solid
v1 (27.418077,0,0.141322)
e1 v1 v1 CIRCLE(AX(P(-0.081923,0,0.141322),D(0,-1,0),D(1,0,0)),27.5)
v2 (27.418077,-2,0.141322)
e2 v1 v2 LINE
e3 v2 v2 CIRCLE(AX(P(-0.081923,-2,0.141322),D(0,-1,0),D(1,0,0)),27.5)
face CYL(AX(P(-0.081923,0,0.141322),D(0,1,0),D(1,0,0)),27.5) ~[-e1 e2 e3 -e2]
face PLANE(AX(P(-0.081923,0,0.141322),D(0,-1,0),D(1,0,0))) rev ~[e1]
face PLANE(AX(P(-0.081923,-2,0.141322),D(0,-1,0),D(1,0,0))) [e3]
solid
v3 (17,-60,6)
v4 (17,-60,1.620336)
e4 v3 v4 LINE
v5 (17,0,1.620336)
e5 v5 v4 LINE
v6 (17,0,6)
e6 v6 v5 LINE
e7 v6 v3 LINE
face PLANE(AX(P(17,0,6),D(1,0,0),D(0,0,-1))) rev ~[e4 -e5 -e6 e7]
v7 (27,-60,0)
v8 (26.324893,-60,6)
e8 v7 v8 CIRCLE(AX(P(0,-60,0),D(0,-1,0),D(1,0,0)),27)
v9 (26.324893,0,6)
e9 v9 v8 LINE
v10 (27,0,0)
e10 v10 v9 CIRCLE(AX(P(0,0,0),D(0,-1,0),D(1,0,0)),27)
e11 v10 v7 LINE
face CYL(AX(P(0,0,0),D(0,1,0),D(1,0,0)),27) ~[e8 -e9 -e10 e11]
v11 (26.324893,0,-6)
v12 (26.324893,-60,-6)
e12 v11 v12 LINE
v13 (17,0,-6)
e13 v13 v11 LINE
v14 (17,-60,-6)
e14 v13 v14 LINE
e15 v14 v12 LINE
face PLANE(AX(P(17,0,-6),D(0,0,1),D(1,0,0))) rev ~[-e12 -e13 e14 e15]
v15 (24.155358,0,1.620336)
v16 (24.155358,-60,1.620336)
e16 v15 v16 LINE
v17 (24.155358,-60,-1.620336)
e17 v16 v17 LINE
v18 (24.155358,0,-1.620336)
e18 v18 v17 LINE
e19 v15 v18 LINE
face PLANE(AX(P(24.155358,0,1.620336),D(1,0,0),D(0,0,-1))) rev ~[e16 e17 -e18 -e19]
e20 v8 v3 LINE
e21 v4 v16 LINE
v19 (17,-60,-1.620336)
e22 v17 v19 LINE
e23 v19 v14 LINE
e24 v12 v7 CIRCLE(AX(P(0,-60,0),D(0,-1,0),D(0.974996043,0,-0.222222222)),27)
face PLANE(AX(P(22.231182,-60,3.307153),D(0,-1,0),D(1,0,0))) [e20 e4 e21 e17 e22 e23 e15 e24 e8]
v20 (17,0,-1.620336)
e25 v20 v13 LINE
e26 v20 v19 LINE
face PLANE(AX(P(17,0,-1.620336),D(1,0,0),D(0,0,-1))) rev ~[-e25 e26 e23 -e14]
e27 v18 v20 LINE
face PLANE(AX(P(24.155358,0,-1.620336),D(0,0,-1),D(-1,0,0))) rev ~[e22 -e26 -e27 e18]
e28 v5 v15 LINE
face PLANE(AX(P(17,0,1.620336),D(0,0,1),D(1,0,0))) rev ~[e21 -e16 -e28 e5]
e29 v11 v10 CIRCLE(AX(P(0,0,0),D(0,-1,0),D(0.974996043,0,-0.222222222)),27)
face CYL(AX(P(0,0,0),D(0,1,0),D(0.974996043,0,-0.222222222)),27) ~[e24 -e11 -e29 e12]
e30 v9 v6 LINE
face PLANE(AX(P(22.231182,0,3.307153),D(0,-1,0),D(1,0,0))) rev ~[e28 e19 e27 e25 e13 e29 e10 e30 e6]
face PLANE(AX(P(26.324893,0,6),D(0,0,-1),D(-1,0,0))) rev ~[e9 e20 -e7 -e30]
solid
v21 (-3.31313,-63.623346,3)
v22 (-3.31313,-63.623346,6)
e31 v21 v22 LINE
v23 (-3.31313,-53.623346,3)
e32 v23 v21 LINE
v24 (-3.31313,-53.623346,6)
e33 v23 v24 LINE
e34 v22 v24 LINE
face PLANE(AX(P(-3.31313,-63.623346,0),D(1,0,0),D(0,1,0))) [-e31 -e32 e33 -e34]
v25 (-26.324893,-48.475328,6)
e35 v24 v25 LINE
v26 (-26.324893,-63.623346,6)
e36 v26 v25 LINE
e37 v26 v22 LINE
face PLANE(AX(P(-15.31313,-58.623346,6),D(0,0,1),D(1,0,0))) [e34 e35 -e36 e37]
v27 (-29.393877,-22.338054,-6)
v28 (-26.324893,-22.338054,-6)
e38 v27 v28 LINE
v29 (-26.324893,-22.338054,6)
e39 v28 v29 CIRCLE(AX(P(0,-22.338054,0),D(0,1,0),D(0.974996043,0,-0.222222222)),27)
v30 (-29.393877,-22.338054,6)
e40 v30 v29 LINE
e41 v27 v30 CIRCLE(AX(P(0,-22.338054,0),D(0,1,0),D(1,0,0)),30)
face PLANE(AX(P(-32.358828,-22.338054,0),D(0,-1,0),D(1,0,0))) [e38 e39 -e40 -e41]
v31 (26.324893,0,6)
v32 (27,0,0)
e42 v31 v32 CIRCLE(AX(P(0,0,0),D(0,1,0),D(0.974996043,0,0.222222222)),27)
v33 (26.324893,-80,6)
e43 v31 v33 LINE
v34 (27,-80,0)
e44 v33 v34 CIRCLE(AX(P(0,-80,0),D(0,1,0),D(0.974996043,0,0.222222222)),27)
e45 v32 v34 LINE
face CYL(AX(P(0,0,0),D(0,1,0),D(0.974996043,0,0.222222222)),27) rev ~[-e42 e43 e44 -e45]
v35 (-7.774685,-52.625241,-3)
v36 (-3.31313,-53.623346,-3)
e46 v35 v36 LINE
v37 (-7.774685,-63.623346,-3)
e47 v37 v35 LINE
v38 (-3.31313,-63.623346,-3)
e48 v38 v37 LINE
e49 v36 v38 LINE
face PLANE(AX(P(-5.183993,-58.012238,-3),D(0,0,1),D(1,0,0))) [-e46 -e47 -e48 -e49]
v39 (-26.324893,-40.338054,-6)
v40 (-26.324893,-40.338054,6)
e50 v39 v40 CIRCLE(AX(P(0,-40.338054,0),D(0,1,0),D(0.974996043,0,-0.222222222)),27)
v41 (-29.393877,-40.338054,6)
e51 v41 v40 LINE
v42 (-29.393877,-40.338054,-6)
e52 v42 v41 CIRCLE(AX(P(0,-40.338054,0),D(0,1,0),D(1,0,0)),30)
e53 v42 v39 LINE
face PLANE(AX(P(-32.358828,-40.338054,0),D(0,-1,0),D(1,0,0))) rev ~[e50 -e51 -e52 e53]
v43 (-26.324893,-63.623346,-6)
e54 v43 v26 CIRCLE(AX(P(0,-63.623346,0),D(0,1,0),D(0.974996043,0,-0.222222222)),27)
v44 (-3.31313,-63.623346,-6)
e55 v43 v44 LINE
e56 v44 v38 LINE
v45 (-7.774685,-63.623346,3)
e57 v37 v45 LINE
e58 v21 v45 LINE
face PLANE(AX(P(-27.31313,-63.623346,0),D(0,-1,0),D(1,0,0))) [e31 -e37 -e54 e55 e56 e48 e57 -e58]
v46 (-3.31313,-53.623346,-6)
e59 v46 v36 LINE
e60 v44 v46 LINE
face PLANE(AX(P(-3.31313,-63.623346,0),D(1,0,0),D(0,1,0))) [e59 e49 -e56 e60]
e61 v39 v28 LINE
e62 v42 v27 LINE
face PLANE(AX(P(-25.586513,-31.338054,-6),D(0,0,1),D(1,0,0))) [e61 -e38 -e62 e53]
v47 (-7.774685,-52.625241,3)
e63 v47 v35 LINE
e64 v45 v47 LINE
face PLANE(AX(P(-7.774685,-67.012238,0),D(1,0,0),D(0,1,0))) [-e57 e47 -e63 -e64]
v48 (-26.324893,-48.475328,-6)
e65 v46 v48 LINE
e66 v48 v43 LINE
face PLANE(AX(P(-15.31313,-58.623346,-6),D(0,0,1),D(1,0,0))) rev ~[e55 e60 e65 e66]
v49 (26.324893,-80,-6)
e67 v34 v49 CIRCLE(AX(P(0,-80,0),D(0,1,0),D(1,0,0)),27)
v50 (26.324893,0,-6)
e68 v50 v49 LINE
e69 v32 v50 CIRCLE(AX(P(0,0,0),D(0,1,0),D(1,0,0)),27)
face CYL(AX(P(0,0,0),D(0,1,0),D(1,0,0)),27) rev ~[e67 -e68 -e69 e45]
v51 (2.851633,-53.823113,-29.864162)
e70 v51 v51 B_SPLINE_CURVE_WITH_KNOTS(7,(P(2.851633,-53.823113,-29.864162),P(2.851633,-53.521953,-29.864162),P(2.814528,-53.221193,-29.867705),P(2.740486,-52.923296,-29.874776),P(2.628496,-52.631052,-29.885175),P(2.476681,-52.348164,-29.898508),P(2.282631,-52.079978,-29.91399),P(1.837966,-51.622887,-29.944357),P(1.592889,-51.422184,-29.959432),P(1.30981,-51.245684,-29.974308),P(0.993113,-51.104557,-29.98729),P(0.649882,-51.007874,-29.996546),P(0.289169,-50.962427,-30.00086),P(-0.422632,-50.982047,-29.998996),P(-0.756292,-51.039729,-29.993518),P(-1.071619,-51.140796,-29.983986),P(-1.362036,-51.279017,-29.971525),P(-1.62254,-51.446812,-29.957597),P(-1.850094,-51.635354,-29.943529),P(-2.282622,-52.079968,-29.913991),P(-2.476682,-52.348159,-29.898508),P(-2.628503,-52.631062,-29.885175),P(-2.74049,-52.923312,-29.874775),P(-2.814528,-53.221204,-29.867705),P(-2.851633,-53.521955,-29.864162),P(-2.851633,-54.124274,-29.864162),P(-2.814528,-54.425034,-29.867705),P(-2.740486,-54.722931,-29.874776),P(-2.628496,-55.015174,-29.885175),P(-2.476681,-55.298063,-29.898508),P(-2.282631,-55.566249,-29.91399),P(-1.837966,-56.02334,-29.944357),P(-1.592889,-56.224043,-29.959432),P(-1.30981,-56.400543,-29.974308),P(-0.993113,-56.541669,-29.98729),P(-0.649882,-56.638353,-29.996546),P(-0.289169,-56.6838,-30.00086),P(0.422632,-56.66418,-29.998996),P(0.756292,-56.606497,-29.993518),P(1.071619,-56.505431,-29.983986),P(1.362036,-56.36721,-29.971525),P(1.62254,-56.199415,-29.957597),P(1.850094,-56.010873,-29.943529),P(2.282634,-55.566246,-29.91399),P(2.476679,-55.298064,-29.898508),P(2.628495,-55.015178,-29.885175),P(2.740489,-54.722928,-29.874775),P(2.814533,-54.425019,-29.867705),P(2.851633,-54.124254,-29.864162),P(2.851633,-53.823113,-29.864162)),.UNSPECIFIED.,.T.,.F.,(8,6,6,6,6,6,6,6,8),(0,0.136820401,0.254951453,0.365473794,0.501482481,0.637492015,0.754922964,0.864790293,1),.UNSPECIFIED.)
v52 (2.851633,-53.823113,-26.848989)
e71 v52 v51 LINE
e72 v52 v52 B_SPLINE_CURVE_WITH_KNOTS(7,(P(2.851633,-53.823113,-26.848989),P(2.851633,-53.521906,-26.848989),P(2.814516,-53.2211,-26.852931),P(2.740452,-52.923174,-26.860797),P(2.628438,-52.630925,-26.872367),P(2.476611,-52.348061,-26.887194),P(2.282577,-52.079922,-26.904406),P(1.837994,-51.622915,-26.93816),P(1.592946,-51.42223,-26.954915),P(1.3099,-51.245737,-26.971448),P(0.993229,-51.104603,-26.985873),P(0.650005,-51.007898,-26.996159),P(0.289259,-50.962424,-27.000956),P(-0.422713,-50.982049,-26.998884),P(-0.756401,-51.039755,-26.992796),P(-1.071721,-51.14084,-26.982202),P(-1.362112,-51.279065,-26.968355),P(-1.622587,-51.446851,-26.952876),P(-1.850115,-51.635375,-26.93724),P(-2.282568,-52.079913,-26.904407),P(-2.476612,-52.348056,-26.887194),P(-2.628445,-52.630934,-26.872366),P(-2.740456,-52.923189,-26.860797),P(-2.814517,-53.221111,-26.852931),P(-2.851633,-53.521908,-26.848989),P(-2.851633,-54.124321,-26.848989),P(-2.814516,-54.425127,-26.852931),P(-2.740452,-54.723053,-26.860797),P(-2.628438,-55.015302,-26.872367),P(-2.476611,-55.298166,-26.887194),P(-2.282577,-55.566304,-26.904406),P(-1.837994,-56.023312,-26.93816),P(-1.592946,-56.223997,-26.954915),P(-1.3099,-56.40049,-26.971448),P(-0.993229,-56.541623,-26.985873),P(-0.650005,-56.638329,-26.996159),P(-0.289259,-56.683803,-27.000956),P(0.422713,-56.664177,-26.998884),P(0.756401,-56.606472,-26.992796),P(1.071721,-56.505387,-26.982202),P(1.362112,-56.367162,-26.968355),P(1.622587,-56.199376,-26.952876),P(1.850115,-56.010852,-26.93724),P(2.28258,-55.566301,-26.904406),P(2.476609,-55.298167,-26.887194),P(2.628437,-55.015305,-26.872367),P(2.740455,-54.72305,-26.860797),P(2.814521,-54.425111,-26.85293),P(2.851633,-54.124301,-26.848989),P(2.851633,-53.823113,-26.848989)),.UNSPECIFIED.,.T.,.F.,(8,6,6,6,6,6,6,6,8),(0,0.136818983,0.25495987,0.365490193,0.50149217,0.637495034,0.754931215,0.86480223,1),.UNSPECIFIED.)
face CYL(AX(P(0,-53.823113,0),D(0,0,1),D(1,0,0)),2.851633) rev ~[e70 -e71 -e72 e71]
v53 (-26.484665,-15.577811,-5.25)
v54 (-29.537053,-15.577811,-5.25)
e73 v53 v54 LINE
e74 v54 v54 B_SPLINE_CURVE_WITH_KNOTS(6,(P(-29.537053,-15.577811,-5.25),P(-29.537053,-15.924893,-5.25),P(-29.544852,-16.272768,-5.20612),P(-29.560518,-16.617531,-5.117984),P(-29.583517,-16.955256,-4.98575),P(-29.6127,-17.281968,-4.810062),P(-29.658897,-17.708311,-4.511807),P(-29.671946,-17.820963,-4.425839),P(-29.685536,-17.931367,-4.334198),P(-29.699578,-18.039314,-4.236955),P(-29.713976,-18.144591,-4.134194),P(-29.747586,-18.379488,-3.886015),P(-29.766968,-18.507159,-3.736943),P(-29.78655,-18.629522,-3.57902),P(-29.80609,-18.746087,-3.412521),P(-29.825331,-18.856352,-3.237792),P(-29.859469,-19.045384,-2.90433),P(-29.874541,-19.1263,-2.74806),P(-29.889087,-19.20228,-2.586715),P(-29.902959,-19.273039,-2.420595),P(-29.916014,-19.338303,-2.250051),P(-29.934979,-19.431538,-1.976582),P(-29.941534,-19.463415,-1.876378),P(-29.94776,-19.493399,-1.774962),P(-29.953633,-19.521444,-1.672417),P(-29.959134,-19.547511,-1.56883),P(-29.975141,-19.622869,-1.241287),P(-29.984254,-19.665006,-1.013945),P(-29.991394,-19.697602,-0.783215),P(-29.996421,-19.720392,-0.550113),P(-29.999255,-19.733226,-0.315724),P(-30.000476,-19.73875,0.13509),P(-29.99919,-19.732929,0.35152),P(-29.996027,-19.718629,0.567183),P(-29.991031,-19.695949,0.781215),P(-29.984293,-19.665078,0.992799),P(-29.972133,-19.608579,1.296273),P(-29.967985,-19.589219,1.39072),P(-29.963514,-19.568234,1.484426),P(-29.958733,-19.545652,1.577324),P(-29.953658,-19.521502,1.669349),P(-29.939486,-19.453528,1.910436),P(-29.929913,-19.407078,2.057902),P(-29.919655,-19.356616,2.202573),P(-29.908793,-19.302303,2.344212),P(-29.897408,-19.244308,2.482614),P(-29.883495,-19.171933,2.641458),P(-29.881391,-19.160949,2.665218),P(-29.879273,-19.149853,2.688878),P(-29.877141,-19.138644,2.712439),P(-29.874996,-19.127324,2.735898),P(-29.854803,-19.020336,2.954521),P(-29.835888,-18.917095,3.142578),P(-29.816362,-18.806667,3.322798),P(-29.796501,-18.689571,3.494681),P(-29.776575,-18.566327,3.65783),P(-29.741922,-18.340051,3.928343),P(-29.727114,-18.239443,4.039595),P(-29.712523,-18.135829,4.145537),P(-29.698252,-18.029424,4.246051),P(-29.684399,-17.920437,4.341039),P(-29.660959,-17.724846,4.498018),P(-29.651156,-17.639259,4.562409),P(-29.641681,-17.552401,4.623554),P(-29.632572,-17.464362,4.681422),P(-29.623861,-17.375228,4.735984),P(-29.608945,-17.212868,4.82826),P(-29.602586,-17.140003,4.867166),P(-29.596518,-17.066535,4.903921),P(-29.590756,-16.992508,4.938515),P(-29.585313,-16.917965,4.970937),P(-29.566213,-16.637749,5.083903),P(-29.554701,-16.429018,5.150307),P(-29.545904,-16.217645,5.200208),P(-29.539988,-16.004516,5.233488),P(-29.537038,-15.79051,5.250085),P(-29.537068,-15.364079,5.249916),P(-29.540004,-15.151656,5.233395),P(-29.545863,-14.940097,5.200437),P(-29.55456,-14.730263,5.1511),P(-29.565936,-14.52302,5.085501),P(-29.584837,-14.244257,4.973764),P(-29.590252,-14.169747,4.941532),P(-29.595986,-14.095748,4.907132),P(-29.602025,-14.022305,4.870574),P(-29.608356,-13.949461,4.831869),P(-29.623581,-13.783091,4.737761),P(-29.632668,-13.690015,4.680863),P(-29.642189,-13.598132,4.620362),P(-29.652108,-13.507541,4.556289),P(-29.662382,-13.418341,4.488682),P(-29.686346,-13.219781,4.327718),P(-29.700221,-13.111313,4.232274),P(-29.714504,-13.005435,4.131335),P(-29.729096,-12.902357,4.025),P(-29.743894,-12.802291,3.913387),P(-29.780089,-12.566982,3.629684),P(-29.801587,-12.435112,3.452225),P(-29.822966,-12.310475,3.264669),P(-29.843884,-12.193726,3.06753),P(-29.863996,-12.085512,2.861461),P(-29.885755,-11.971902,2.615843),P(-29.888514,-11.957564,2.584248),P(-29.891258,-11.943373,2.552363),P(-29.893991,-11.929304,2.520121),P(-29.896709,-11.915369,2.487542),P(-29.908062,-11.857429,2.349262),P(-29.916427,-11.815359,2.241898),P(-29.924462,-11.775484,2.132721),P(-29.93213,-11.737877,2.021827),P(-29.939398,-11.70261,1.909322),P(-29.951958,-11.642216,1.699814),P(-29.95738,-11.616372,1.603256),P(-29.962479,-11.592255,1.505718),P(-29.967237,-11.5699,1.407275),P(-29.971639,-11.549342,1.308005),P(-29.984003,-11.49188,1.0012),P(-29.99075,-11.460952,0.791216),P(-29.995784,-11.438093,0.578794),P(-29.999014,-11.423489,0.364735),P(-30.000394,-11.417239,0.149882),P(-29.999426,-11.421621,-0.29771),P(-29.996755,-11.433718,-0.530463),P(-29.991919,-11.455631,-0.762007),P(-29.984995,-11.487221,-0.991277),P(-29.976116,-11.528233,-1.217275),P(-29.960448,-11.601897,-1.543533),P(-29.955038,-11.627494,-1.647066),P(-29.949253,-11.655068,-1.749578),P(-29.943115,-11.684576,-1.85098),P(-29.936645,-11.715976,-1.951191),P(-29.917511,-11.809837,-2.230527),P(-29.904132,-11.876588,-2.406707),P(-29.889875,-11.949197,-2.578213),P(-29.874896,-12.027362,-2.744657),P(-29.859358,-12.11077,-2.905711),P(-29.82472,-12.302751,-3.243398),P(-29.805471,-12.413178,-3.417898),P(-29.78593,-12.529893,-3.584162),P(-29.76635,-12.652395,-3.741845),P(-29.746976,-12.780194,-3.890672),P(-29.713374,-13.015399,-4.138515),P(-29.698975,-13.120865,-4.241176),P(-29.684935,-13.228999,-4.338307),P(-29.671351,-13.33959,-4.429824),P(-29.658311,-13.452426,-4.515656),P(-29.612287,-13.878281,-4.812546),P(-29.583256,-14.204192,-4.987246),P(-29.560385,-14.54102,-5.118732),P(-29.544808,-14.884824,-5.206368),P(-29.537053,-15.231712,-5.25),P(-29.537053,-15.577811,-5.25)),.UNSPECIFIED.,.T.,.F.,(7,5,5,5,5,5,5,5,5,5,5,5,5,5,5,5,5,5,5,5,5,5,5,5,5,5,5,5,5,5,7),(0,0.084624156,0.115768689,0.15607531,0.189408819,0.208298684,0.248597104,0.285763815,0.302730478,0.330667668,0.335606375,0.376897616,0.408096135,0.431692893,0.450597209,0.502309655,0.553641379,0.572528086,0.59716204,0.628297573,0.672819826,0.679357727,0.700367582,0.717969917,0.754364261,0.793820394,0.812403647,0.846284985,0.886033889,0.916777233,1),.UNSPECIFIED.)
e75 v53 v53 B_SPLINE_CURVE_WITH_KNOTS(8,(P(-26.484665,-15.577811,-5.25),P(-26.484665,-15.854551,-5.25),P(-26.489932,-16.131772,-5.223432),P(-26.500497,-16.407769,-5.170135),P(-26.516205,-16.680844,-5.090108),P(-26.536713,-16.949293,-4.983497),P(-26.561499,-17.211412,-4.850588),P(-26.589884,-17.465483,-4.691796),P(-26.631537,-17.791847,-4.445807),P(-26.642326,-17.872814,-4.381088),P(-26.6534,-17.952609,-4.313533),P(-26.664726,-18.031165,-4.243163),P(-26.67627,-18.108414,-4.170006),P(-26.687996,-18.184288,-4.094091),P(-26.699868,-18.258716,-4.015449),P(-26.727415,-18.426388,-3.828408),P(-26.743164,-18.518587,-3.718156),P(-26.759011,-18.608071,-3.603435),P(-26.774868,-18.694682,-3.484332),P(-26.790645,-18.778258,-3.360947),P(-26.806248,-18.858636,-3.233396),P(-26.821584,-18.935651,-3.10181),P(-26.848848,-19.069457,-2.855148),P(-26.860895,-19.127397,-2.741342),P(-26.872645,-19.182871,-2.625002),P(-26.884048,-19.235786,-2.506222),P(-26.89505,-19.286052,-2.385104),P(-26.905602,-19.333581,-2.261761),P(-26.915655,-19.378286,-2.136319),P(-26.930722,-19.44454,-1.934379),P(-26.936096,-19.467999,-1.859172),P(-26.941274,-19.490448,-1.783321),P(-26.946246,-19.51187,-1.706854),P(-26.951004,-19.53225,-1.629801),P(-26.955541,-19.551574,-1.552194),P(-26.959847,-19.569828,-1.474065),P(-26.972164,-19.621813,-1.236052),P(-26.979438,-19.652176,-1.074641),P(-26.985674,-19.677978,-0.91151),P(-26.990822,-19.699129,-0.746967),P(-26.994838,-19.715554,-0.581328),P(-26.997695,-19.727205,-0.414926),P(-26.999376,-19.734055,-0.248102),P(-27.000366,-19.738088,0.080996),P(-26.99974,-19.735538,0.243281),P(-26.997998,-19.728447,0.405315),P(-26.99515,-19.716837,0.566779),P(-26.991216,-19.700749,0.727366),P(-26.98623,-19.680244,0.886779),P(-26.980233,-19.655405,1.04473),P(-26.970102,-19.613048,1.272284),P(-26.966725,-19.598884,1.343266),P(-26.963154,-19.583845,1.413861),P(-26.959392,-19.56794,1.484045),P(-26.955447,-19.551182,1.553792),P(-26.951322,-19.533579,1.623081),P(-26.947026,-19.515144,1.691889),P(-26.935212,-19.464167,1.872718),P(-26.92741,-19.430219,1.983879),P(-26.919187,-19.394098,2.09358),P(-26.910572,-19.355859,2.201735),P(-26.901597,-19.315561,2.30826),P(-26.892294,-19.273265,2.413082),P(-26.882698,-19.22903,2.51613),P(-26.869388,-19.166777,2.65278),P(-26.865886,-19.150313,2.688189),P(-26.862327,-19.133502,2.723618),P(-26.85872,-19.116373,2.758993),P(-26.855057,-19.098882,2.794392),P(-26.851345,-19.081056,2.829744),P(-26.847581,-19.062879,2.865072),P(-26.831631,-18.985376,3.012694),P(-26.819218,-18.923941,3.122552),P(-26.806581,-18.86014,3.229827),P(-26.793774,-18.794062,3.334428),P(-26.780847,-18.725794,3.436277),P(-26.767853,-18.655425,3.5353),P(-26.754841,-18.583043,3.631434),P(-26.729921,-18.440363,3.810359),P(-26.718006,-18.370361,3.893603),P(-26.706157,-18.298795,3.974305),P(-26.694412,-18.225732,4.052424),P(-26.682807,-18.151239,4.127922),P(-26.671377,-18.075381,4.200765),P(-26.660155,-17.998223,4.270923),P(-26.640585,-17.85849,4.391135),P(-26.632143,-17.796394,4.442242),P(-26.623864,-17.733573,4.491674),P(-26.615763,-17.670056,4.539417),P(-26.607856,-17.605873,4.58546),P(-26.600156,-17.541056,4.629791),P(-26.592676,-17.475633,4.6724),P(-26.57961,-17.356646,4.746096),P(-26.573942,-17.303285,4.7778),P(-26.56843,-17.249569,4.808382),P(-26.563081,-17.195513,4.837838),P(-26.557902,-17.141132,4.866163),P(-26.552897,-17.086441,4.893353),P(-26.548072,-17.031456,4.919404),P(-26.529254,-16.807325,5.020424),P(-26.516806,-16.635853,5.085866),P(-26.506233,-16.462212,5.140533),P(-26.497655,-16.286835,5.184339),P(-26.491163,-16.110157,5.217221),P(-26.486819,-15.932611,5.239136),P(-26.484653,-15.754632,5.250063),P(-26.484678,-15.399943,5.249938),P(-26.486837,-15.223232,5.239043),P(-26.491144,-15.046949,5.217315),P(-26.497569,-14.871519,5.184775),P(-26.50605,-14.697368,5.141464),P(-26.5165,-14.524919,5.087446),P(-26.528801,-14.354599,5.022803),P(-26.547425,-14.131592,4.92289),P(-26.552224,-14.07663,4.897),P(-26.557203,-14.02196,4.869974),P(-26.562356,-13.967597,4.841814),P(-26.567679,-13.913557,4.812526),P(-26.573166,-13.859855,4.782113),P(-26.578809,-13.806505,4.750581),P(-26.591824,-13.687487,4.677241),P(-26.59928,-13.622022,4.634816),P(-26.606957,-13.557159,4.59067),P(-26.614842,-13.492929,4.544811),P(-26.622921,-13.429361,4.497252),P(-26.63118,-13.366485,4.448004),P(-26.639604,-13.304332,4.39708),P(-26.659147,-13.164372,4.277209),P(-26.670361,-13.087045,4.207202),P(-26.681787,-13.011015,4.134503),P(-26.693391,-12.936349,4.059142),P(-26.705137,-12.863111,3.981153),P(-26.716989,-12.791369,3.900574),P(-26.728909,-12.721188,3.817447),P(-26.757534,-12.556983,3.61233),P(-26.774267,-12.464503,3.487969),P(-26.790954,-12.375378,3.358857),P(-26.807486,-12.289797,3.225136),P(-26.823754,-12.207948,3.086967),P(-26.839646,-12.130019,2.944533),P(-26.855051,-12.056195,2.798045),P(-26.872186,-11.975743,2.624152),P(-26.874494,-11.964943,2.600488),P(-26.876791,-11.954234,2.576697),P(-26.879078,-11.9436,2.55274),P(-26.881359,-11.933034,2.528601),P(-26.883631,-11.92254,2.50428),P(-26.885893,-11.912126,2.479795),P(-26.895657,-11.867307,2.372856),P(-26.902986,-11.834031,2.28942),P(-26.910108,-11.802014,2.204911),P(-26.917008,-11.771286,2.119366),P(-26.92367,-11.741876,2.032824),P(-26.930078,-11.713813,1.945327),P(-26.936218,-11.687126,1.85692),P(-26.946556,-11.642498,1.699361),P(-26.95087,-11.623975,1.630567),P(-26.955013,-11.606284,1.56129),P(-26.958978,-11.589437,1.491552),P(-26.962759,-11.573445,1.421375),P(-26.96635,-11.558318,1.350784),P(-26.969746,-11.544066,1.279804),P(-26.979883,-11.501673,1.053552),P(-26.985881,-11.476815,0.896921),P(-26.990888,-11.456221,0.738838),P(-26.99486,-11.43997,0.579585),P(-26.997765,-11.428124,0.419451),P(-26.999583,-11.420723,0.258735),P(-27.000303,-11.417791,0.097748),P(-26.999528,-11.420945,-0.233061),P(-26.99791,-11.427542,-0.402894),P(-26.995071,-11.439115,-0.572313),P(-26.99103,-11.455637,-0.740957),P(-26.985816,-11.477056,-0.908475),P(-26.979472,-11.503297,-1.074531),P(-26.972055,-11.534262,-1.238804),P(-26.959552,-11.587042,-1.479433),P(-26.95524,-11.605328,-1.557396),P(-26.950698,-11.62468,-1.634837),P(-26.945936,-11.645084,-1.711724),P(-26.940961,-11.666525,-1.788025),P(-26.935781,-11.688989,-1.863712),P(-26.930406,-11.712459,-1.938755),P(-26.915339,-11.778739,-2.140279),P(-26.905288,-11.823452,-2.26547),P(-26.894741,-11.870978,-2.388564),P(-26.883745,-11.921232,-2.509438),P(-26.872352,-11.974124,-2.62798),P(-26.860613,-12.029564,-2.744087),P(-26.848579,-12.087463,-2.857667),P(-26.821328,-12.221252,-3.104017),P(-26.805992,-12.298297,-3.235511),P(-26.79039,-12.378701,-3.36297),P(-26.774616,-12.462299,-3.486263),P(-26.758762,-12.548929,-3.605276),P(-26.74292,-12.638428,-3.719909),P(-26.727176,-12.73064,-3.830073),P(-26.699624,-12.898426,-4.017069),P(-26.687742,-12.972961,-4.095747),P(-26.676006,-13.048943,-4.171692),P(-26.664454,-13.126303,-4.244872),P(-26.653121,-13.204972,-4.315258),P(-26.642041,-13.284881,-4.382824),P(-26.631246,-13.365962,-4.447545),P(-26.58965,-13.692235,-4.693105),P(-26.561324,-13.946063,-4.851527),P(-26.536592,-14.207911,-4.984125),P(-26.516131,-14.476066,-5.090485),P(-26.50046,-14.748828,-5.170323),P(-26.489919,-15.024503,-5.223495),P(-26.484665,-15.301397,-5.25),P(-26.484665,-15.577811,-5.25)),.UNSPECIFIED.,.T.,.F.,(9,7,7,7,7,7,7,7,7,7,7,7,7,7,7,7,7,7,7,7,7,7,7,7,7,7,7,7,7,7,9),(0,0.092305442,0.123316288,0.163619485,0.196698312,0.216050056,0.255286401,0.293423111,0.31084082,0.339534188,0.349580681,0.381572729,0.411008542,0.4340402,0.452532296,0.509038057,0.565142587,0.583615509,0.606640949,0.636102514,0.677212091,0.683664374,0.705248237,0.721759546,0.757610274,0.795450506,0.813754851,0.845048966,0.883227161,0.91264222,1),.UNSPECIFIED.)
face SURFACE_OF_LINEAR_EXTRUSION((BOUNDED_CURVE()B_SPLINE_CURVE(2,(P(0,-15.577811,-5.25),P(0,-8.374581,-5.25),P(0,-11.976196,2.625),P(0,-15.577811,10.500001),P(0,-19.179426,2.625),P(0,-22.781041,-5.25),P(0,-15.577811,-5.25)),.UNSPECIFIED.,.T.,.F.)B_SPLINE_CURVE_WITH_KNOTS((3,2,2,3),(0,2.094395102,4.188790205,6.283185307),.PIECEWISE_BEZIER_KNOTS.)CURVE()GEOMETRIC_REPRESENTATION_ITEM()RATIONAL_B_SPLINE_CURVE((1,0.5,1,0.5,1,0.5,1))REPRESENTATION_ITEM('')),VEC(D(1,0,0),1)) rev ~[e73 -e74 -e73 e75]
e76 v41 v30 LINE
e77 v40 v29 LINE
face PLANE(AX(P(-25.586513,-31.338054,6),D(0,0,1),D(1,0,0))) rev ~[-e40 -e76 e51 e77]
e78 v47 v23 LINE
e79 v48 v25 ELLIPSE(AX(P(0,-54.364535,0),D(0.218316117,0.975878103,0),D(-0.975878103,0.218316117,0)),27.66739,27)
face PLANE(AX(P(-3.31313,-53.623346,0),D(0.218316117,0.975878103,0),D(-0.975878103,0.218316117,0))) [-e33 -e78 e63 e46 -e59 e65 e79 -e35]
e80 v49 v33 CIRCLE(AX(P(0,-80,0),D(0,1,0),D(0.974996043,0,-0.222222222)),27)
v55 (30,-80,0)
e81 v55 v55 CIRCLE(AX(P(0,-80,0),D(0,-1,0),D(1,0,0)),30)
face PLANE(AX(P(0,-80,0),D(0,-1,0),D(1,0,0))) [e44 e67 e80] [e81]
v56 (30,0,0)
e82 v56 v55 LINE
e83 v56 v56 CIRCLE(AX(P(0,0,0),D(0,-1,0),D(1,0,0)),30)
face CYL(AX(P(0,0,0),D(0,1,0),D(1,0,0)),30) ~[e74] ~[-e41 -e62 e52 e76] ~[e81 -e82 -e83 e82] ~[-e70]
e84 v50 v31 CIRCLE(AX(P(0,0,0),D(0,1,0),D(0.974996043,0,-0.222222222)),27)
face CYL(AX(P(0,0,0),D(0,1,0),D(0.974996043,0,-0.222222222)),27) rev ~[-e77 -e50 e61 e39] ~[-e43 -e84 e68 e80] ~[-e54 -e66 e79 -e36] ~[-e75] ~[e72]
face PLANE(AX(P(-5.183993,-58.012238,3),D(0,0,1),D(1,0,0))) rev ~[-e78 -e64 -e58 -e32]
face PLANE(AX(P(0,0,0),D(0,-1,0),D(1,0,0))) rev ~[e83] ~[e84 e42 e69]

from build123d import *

# Parameters (mm, degrees)
F0_R      = 30
F1_DEPTH  = 80
F2_R      = 27.5
F3_DEPTH  = 2
F4_W      = 13.5446311965
F4_H      = 18
F5_DEPTH  = 6
F6_R      = 2.851632841
F7_DEPTH  = 34.4
F9_DEPTH  = 6
F8_W      = 24
F8_H      = 10
F10_DEPTH = 6
F11_W     = 5.1813843587
F11_H     = 18
F12_DEPTH = 3
F13_DEPTH = 60
F15_DEPTH = 50


# Not quite as in the source:
# - a feature names something its author has since deleted; it is built from what else it names


with BuildPart() as f1:
    # F0 (on Front) → F1 (new body)
    with BuildSketch(Plane.XZ):
        Circle(F0_R)
        with BuildLine():
            ThreePointArc((26.3248931622, 6), (26.8306924564, 3.0189306568), (27, 0))
            ThreePointArc((27, 0), (26.8306924564, -3.0189306568), (26.3248931622, -6))
            ThreePointArc((26.3248931622, -6), (-27, 0), (26.3248931622, 6))
        make_face(mode=Mode.SUBTRACT)
    extrude(amount=F1_DEPTH)

    # F4 (on Top) → F5 (cut, symmetric)
    with BuildSketch(Plane.XY):
        with Locations((-25.5865128711, -31.3380542621)):
            Rectangle(F4_W, F4_H)
    extrude(amount=F5_DEPTH, both=True, mode=Mode.SUBTRACT)

    # F6 (on Top) → F7 (cut)
    with BuildSketch(Plane.XY):
        with Locations((0, -53.8231134415)):
            Circle(F6_R)
    extrude(amount=-F7_DEPTH, mode=Mode.SUBTRACT)

    # F8 (on Top) → F9 (join, symmetric)
    with BuildSketch(Plane.XY):
        Polygon((-27.3131299764, -53.6233463883), (-3.3131299764, -53.6233463883), (-27.464909479, -48.2202917337), align=None)
    extrude(amount=F9_DEPTH, both=True)

    # F8 (on Top) → F10 (join, symmetric)
    with BuildSketch(Plane.XY):
        with Locations((-15.3131299764, -58.6233463883)):
            Rectangle(F8_W, F8_H)
    extrude(amount=F10_DEPTH, both=True)

    # F11 (on Top) → F12 (cut, symmetric)
    with BuildSketch(Plane.XY):
        with Locations((-5.1839929656, -58.0122377723)):
            Rectangle(F11_W, F11_H)
    extrude(amount=F12_DEPTH, both=True, mode=Mode.SUBTRACT)

    # F14 (on Right) → F15 (cut)
    with BuildSketch(Plane.YZ):
        with BuildLine():
            add(Edge.make_bspline(
                [(-15.5778108165, -5.2500003949), (-8.3745810525, -5.2500003949), (-11.9761959345, 2.6250001974), (-15.5778108165, 10.5000007898), (-19.1794256985, 2.6250001974), (-22.7810405805, -5.2500003949), (-15.5778108165, -5.2500003949)],
                knots=[0, 0, 0, 2.0943951024, 2.0943951024, 4.1887902048, 4.1887902048, 6.2831853072, 6.2831853072, 6.2831853072], degree=2, weights=[1, 0.5, 1, 0.5, 1, 0.5, 1]))
        make_face()
    extrude(amount=-F15_DEPTH, mode=Mode.SUBTRACT)


with BuildPart() as f3:
    # F2 (on Front) → F3 (new body)
    with BuildSketch(Plane.XZ):
        with Locations((-0.0819229608, 0.1413219288)):
            Circle(F2_R)
    extrude(amount=F3_DEPTH)


with BuildPart() as f13:
    # F0 (on Front) → F13 (new body)
    with BuildSketch(Plane.XZ):
        with BuildLine():
            Line((24.1553578526, 0), (27, 0))
            ThreePointArc((27, 0), (26.8306924564, 3.0189306568), (26.3248931622, 6))
            Line((26.3248931622, 6), (17, 6))
            Line((17, 6), (17, 1.6203357372))
            Line((17, 1.6203357372), (24.1553578526, 1.6203357372))
            Line((24.1553578526, 1.6203357372), (24.1553578526, 0))
        make_face()
        with BuildLine():
            ThreePointArc((26.3248931622, -6), (26.8306924564, -3.0189306568), (27, 0))
            Line((27, 0), (24.1553578526, 0))
            Line((24.1553578526, 0), (24.1553578526, -1.6203357372))
            Line((24.1553578526, -1.6203357372), (17, -1.6203357372))
            Line((17, -1.6203357372), (17, -6))
            Line((17, -6), (26.3248931622, -6))
        make_face()
    extrude(amount=F13_DEPTH)


solid = Compound([f1.part, f3.part, f13.part])
